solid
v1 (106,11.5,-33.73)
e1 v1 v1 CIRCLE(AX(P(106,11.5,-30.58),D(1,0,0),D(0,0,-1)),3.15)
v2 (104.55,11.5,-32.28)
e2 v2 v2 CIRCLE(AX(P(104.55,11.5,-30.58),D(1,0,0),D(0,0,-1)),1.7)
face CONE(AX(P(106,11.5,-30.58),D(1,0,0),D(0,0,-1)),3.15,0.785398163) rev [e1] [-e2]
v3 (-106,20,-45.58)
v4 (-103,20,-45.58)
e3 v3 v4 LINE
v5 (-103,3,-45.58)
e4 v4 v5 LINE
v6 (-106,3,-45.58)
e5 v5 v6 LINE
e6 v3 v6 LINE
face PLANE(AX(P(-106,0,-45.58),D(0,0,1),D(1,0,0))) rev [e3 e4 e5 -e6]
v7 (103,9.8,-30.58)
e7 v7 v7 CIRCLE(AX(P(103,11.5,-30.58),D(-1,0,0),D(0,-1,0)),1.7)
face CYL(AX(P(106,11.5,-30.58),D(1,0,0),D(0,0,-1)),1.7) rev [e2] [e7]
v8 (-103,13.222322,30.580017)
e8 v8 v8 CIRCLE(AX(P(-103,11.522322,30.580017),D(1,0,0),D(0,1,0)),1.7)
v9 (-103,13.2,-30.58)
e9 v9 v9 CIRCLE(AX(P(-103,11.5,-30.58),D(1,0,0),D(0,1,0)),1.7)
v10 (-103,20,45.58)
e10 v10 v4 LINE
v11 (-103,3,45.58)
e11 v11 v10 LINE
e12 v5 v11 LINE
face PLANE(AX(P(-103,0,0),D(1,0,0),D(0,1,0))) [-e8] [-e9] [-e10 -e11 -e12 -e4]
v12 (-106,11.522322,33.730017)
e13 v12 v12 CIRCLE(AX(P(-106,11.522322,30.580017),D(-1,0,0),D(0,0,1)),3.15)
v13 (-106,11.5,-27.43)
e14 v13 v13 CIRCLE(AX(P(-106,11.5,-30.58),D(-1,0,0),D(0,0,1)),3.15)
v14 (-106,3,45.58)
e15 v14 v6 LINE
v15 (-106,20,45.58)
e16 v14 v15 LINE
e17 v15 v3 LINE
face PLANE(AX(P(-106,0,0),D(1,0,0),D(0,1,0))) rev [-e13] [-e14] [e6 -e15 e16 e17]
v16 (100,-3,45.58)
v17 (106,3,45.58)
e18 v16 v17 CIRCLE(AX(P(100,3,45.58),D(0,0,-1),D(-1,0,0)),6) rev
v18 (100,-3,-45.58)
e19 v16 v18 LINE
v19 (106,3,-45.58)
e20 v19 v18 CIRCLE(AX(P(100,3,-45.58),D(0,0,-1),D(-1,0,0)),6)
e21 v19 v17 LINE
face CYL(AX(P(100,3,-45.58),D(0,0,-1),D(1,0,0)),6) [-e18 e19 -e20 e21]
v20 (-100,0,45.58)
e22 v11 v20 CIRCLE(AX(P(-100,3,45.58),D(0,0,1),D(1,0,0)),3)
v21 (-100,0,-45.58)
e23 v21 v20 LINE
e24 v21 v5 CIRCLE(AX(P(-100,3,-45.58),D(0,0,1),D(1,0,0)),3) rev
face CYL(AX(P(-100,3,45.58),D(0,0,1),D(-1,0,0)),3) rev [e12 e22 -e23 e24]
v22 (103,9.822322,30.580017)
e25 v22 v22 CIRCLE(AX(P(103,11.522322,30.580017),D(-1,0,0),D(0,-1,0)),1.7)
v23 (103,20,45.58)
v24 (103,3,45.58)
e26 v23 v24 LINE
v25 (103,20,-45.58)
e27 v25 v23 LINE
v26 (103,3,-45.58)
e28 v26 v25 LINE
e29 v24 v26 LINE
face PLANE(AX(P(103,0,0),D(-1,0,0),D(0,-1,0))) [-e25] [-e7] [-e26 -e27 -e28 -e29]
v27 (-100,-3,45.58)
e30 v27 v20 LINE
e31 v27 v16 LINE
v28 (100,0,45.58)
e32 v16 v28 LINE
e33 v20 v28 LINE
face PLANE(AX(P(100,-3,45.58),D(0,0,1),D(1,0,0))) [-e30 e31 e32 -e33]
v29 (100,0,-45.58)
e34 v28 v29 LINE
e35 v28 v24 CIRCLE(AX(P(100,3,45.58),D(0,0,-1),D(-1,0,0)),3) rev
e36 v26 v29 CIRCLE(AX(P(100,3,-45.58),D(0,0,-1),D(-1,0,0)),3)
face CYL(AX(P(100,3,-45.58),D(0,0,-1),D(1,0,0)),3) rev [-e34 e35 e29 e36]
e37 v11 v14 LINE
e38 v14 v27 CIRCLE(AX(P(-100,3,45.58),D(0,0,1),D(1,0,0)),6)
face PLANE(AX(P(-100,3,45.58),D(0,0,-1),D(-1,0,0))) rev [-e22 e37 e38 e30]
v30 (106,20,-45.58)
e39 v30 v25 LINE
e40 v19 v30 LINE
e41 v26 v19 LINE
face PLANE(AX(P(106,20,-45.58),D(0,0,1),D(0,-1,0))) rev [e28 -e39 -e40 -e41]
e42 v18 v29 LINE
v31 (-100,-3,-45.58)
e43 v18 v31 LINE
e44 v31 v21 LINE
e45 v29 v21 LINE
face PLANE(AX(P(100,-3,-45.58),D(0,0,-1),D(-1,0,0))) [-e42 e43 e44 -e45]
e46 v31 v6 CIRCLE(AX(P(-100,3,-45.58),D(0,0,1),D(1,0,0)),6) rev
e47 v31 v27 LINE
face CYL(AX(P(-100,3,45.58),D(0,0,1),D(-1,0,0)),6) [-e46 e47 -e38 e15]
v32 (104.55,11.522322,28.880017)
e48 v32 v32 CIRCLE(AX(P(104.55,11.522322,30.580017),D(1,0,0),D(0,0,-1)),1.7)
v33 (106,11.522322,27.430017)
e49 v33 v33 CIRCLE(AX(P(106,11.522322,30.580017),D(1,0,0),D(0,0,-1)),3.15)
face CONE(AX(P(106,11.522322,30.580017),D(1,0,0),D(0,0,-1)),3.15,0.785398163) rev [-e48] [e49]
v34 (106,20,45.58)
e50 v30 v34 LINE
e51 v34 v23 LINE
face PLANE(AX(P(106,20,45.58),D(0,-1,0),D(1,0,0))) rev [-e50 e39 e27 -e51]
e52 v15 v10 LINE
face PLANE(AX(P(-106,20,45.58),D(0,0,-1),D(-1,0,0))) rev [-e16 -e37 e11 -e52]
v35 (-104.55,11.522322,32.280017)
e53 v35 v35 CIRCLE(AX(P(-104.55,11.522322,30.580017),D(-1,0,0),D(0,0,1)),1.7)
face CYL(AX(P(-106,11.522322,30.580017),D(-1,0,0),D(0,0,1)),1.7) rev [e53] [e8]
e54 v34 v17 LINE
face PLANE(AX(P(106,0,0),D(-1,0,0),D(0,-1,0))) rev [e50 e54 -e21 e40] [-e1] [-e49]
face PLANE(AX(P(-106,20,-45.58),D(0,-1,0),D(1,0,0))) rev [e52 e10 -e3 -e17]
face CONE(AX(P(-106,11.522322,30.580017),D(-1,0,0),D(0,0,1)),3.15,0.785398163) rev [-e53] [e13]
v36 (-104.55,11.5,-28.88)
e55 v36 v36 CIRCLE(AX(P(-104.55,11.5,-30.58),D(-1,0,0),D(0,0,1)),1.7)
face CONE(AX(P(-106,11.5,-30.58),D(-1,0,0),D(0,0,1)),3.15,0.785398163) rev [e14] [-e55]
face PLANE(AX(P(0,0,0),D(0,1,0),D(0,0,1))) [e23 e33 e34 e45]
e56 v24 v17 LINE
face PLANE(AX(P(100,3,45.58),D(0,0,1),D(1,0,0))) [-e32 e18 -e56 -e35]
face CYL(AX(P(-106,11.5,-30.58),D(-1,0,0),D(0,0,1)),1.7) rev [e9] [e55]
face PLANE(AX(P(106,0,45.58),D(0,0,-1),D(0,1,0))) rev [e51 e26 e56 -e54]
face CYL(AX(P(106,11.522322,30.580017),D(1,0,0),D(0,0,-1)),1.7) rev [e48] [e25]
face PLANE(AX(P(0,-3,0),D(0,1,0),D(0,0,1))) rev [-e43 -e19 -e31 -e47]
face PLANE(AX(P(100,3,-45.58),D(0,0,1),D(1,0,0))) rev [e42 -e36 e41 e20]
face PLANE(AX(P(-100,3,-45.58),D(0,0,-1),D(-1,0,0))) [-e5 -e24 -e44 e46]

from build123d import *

# Parameters (mm, degrees)
SKETCH_1_W                            = 200
SKETCH_1_H                            = 91.16
SM_BASE_FLANGE_1_DEPTH                = 3
SM_EDGE_FLANGE_1_DEPTH                = 91.16
SM_EDGE_FLANGE_1_BEND_DEPTH           = 91.16
HOLE_WIZARD_M31_D                     = 3.4
HOLE_WIZARD_M31_DEPTH                 = 8.5
HOLE_WIZARD_M31_CSINK_D               = 6.3
HOLE_WIZARD_M31_CSINK_ANGLE           = 90
HOLE_WIZARD_M31_TIP                   = 1.021463052
HOLE_WIZARD_M31_ON_FACE_2_D           = 3.4
HOLE_WIZARD_M31_ON_FACE_2_DEPTH       = 8.5
HOLE_WIZARD_M31_ON_FACE_2_CSINK_D     = 6.3
HOLE_WIZARD_M31_ON_FACE_2_CSINK_ANGLE = 90
HOLE_WIZARD_M31_ON_FACE_2_TIP         = 1.021463052


# Sheet-metal steps are written as plain solids
with BuildPart() as part:
    # Sketch 1 → Базовая кромка1 (new body)
    with BuildSketch(Plane(origin=(0, 0, 0), x_dir=(1, 0, 0), z_dir=(0, 1, 0))):
        Rectangle(SKETCH_1_W, SKETCH_1_H)
    extrude(amount=-SM_BASE_FLANGE_1_DEPTH)

    # Ребро-кромка1 section (across the edge) → Ребро-кромка1 (add)
    with BuildSketch(Plane(origin=(-103, 0, -45.58), x_dir=(1, 0, 0), z_dir=(0, 0, 1))):
        with BuildLine():
            Line((-3, 3), (-3, 20))
            Line((-3, 20), (0, 20))
            Line((0, 20), (0, 3))
            ThreePointArc((0, 3), (0.878679656, 0.878679656), (3, 0))
            Line((3, 0), (3, -3))
            ThreePointArc((3, -3), (-1.242640687, -1.242640687), (-3, 3))
        make_face()
    extrude(amount=SM_EDGE_FLANGE_1_DEPTH)

    # Ребро-кромка1 section 2 (across the edge) → Ребро-кромка1 bend (add)
    with BuildSketch(Plane(origin=(103, 0, 45.58), x_dir=(-1, 0, 0), z_dir=(0, 0, -1))):
        with BuildLine():
            Line((-3, 3), (-3, 20))
            Line((-3, 20), (0, 20))
            Line((0, 20), (0, 3))
            ThreePointArc((0, 3), (0.878679656, 0.878679656), (3, 0))
            Line((3, 0), (3, -3))
            ThreePointArc((3, -3), (-1.242640687, -1.242640687), (-3, 3))
        make_face()
    extrude(amount=SM_EDGE_FLANGE_1_BEND_DEPTH)

    # Зенковка для  винта с плоской головкой M31
    with Locations(Plane(origin=(106, 11.522322038, 30.580016609), x_dir=(0, 1, 0), z_dir=(1, 0, 0))):
        with Locations((0, 0), (-0.022322038, -61.160016609)):
            CounterSinkHole(HOLE_WIZARD_M31_D / 2, HOLE_WIZARD_M31_CSINK_D / 2, depth=HOLE_WIZARD_M31_DEPTH, counter_sink_angle=HOLE_WIZARD_M31_CSINK_ANGLE)
            with Locations((0, 0, -(HOLE_WIZARD_M31_DEPTH + HOLE_WIZARD_M31_TIP / 2))):  # 118° drill point
                Cone(0, HOLE_WIZARD_M31_D / 2, HOLE_WIZARD_M31_TIP, mode=Mode.SUBTRACT)

    # Зенковка для  винта с плоской головкой M31 on face 2
    with Locations(Plane(origin=(-106, 11.5, -30.58), x_dir=(0, 0, -1), z_dir=(-1, 0, 0))):
        with Locations((0, 0), (-61.160016609, -0.022322038)):
            CounterSinkHole(HOLE_WIZARD_M31_ON_FACE_2_D / 2, HOLE_WIZARD_M31_ON_FACE_2_CSINK_D / 2, depth=HOLE_WIZARD_M31_ON_FACE_2_DEPTH, counter_sink_angle=HOLE_WIZARD_M31_ON_FACE_2_CSINK_ANGLE)
            with Locations((0, 0, -(HOLE_WIZARD_M31_ON_FACE_2_DEPTH + HOLE_WIZARD_M31_ON_FACE_2_TIP / 2))):  # 118° drill point
                Cone(0, HOLE_WIZARD_M31_ON_FACE_2_D / 2, HOLE_WIZARD_M31_ON_FACE_2_TIP, mode=Mode.SUBTRACT)


solid = part.part
